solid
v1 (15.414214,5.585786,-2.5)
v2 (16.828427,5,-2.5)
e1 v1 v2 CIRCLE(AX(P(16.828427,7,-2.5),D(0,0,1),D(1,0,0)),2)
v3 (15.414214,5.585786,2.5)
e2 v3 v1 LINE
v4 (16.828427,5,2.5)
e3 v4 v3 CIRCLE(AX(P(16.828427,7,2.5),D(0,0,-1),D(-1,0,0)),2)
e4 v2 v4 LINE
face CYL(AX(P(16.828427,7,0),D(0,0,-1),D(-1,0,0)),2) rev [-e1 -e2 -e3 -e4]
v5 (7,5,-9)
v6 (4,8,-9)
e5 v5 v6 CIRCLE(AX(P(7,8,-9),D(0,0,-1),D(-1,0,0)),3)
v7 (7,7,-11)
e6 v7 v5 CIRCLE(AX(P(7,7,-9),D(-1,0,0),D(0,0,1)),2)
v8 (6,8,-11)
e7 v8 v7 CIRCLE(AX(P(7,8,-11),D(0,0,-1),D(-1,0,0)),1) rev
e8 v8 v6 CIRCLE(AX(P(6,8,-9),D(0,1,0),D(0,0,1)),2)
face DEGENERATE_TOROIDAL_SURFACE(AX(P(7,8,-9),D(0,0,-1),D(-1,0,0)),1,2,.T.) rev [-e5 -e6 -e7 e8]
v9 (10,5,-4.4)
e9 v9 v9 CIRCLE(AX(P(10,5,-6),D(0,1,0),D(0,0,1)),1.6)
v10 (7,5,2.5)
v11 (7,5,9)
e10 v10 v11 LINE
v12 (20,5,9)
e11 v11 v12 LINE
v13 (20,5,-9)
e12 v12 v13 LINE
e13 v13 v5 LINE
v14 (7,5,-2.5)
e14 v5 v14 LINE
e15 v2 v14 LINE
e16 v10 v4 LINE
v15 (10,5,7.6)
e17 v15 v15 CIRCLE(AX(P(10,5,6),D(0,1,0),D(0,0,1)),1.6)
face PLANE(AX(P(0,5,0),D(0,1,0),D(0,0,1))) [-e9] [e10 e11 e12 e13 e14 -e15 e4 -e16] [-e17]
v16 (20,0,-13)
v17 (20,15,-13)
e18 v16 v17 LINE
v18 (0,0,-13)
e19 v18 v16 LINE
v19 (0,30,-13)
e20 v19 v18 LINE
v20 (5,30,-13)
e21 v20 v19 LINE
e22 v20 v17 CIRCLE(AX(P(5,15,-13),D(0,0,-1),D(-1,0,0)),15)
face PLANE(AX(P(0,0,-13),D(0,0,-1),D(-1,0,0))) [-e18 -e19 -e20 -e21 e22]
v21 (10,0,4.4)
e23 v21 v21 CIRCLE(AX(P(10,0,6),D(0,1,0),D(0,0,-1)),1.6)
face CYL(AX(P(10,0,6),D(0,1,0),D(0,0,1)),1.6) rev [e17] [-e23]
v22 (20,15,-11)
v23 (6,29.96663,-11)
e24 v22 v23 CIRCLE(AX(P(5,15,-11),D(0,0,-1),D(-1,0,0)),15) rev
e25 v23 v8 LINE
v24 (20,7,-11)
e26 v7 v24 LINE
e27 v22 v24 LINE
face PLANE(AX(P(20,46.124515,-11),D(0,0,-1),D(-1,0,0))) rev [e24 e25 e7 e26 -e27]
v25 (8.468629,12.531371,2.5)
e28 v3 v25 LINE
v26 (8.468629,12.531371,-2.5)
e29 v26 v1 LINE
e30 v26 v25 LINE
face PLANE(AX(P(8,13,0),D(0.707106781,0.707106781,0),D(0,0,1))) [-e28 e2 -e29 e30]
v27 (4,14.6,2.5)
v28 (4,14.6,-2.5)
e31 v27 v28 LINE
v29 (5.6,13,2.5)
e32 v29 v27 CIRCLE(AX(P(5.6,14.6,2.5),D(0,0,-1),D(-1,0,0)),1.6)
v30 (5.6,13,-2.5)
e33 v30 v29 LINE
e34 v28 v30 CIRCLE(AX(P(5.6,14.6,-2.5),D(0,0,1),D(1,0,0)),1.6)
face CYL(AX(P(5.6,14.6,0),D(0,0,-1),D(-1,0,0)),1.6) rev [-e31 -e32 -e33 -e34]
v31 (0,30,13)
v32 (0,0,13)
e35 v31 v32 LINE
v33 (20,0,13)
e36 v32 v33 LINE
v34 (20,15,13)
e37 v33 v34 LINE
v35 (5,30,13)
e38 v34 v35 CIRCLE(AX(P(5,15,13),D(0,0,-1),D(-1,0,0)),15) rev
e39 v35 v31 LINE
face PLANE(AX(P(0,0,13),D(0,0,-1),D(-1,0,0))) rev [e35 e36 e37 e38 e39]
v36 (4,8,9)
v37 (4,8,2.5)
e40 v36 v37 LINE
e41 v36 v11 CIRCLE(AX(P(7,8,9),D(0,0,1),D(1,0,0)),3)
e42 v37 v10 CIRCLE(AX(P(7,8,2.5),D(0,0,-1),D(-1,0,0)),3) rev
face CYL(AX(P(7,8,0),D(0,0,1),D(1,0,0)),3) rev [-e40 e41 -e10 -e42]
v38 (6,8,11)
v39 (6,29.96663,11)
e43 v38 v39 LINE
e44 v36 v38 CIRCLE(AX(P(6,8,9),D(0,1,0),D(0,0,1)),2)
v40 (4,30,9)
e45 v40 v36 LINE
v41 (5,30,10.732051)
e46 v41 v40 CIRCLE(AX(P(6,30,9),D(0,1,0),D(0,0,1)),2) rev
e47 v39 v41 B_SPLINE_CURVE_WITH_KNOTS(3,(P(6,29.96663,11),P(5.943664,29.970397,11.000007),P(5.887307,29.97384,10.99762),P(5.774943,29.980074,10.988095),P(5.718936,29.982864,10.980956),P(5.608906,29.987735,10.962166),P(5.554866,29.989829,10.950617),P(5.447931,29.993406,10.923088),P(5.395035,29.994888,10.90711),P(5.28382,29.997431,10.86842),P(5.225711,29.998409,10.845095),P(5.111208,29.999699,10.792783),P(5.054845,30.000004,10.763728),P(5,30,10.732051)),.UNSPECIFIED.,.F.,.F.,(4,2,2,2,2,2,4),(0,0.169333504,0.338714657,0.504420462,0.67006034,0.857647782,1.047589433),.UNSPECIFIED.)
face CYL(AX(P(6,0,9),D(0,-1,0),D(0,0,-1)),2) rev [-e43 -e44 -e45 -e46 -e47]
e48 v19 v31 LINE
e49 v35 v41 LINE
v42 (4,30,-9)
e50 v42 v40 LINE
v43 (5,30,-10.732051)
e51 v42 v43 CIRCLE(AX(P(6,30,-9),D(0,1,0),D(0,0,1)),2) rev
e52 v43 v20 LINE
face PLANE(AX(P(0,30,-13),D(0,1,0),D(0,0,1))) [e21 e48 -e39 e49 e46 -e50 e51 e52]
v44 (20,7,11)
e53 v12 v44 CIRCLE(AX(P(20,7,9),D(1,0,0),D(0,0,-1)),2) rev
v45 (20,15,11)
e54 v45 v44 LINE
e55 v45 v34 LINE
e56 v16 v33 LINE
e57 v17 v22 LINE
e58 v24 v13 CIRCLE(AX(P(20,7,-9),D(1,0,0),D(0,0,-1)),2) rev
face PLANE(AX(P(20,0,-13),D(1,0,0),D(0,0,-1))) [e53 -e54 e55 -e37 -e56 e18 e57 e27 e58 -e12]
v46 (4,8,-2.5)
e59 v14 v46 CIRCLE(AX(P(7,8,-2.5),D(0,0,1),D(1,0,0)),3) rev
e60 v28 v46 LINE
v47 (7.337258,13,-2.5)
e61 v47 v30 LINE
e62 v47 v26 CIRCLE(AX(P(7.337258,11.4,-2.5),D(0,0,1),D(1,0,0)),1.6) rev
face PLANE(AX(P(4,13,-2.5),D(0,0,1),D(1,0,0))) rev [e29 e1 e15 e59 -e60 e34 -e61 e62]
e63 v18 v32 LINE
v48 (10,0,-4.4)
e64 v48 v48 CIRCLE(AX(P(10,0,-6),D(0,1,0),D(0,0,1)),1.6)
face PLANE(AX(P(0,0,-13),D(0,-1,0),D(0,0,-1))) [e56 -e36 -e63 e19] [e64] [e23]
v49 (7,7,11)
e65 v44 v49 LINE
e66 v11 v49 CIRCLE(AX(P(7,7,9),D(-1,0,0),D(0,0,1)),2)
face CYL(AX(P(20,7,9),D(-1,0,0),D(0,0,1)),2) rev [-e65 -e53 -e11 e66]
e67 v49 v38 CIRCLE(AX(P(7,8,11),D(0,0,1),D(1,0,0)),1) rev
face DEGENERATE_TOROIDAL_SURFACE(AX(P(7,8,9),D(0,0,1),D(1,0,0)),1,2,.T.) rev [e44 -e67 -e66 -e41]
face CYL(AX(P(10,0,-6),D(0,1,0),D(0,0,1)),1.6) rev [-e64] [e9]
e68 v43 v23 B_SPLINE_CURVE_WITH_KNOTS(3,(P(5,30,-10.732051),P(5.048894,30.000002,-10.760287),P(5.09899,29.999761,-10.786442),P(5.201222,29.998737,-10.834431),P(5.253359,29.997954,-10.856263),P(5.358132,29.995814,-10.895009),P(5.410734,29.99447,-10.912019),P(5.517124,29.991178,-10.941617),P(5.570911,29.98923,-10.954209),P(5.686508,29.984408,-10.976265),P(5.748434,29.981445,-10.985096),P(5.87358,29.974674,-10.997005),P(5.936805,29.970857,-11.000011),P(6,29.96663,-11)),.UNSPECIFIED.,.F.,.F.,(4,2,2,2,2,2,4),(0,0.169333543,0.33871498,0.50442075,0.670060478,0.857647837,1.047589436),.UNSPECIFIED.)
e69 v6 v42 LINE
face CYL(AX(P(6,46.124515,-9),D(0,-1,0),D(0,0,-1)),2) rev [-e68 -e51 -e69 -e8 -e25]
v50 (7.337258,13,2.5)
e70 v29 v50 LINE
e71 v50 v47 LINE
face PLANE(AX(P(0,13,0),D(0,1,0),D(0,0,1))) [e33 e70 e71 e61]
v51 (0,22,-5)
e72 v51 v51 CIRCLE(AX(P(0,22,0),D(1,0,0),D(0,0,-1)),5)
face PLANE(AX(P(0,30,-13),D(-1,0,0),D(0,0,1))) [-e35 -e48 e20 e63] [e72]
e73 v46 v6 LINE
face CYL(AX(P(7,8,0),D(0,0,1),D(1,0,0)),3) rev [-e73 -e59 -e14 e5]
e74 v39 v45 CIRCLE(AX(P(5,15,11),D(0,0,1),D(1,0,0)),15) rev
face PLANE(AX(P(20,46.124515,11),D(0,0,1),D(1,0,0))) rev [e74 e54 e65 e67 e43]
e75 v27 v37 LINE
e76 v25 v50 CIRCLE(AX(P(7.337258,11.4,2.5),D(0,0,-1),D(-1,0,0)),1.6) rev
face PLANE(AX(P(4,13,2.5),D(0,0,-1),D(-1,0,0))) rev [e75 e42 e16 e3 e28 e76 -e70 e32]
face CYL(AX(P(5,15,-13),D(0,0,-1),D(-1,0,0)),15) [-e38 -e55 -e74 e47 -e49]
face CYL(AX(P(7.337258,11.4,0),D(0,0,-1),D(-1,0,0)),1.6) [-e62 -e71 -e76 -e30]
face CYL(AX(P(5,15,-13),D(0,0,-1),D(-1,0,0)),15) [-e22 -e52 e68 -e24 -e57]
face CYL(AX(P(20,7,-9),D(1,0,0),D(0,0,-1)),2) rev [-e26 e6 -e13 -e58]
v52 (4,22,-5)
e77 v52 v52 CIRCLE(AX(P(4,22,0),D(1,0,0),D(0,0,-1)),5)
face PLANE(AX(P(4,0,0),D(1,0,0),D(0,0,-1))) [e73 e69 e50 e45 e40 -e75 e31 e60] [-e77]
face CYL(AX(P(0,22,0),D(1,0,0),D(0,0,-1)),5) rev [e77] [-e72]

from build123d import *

# Parameters (mm, degrees)
EXTRUDE_1_DEPTH      = 13
EXTRUDE_1_DEPTH_BACK = 13
SKETCH_2_R           = 5
CUT_EXTRUDE_1_DEPTH  = 38.322915213
SKETCH_3_R           = 1.6
CUT_EXTRUDE_2_DEPTH  = 37.783148315
EXTRUDE_START        = 3
SKETCH_4_W           = 18
SKETCH_4_H           = 26
SKETCH_4_R           = 1.6
EXTRUDE_2_DEPTH      = 3
EXTRUDE_START_2      = 2
SKETCH_5_W           = 26
SKETCH_5_H           = 25
SKETCH_5_R           = 5
EXTRUDE_3_DEPTH      = 2
SKETCH_6_W           = 14
SKETCH_6_H           = 5
EXTRUDE_4_DEPTH      = 8
CHAMFER_1_SIZE       = 10
FILLET_1_R           = 3
EXTRUDE_5_REACH      = 36.554
SKETCH_7_W           = 16
SKETCH_7_H           = 2
FILLET_2_R           = 15
FILLET_3_R           = 2
FILLET_4_R           = 1.6


with BuildPart() as part:
    # 草图1 → 凸台-拉伸1 (new, two sides: drawn at the far end of the back side and taken through both)
    with BuildSketch(Plane.XY.offset(-EXTRUDE_1_DEPTH_BACK)):
        Polygon((0, 30), (0, 0), (20, 0), (20, 2), (2, 2), (2, 30), align=None)
    extrude(amount=EXTRUDE_1_DEPTH + EXTRUDE_1_DEPTH_BACK)

    # 草图2 → 切除-拉伸1 (cut, through all)
    with BuildSketch(Plane(origin=(2, 0, 0), x_dir=(0, 0, -1), z_dir=(1, 0, 0))):
        with Locations((0, 22)):
            Circle(SKETCH_2_R)
    extrude(amount=-CUT_EXTRUDE_1_DEPTH, mode=Mode.SUBTRACT)

    # 草图3 → 切除-拉伸2 (cut, through all)
    with BuildSketch(Plane(origin=(0, 2, 0), x_dir=(1, 0, 0), z_dir=(0, 1, 0))):
        with Locations(Location((10, 6, 0), (0, 0, 270))):
            Circle(SKETCH_3_R)
        with Locations(Location((10, -6, 0), (0, 0, 90))):
            Circle(SKETCH_3_R)
    extrude(amount=-CUT_EXTRUDE_2_DEPTH, mode=Mode.SUBTRACT)

    # 草图4 → 凸台-拉伸2 (add)
    with BuildSketch(Plane(origin=(0, 2, 0), x_dir=(1, 0, 0), z_dir=(0, 1, 0)).offset(EXTRUDE_START)):
        with Locations((11, 0)):
            Rectangle(SKETCH_4_W, SKETCH_4_H)
        with Locations(Location((10, -6, 0), (0, 0, 270))):
            Circle(SKETCH_4_R, mode=Mode.SUBTRACT)
        with Locations(Location((10, 6, 0), (0, 0, 270))):
            Circle(SKETCH_4_R, mode=Mode.SUBTRACT)
    extrude(amount=-EXTRUDE_2_DEPTH)

    # 草图5 → 凸台-拉伸3 (add)
    with BuildSketch(Plane(origin=(2, 0, 0), x_dir=(0, 0, -1), z_dir=(1, 0, 0)).offset(EXTRUDE_START_2)):
        with Locations((0, 17.5)):
            Rectangle(SKETCH_5_W, SKETCH_5_H)
        with Locations((0, 22)):
            Circle(SKETCH_5_R, mode=Mode.SUBTRACT)
    extrude(amount=-EXTRUDE_3_DEPTH)

    # 草图6 → 凸台-拉伸4 (add)
    with BuildSketch(Plane(origin=(0, 5, 0), x_dir=(1, 0, 0), z_dir=(0, 1, 0))):
        with Locations((11, 0)):
            Rectangle(SKETCH_6_W, SKETCH_6_H)
    extrude(amount=EXTRUDE_4_DEPTH)

    # 倒角1
    # the kernel refuses this chamfer: 10 mm, written as the material it takes off along each edge
    with BuildSketch(Plane(origin=(18, 13, -28.21682988), x_dir=(-0.9996219169112968, 0.027495876610586317, 0), z_dir=(0, 0, 1))) as chamfer_1_piece_1_section:
        Polygon((CHAMFER_1_SIZE * 0.999621916911, CHAMFER_1_SIZE * 0.0274958766106), (-CHAMFER_1_SIZE * 0.0274958766106, CHAMFER_1_SIZE * 0.999621916911), (0, 0), align=None)
    chamfer_1_piece_1 = extrude(amount=56.433659759, mode=Mode.PRIVATE)
    chamfer_1_piece_1 = split(chamfer_1_piece_1, bisect_by=Plane(origin=(14.542815877, 5, 0), z_dir=(0, 1, 0)), keep=Keep.TOP, mode=Mode.PRIVATE)
    add(chamfer_1_piece_1, mode=Mode.SUBTRACT)

    # 圆角1
    fillet_1_edges = [part.edges().sort_by_distance(p)[0] for p in [
        (4, 5, 7.75),
        (4, 5, -7.75),
    ]]
    fillet(fillet_1_edges, radius=FILLET_1_R)

    # 凸台-拉伸5: up to this face of the body (flat: up to its plane)
    extrude_5_end = Plane(part.part.faces().sort_by_distance((2, 30, 0))[0])
    # 草图7 → 凸台-拉伸5 (add, up to the picked face)
    with BuildSketch(Plane(origin=(0, 5, 0), x_dir=(1, 0, 0), z_dir=(0, 1, 0)), mode=Mode.PRIVATE) as extrude_5_sk1:
        with Locations((12, 12)):
            Rectangle(SKETCH_7_W, SKETCH_7_H)
    extrude_5_tool1 = split(extrude(extrude_5_sk1.sketch, amount=EXTRUDE_5_REACH, mode=Mode.PRIVATE), bisect_by=extrude_5_end, keep=Keep.BOTH, mode=Mode.PRIVATE)
    # 草图7 → 凸台-拉伸5 (add, up to the picked face)
    with BuildSketch(Plane(origin=(0, 5, 0), x_dir=(1, 0, 0), z_dir=(0, 1, 0)), mode=Mode.PRIVATE) as extrude_5_sk2:
        with Locations((12, -12)):
            Rectangle(SKETCH_7_W, SKETCH_7_H)
    extrude_5_tool2 = split(extrude(extrude_5_sk2.sketch, amount=EXTRUDE_5_REACH, mode=Mode.PRIVATE), bisect_by=extrude_5_end, keep=Keep.BOTH, mode=Mode.PRIVATE)
    add(extrude_5_tool1.solids().sort_by(Axis((12, 5, -12), (0, 1, 0)))[0])
    add(extrude_5_tool2.solids().sort_by(Axis((12, 5, 12), (0, 1, 0)))[0])

    # 圆角2
    fillet_2_edges = [part.edges().sort_by_distance(p)[0] for p in [
        (20, 30, -12),
        (20, 30, 12),
    ]]
    fillet(fillet_2_edges, radius=FILLET_2_R)

    # 圆角3
    fillet_3_edges = [part.edges().sort_by_distance(p)[0] for p in [
        (13.5, 5, 11),
        (4.878679656, 5.878679656, 11),
        (13.5, 5, -11),
        (4.878679656, 5.878679656, -11),
        (16, 5, 0),
        (4, 19, 11),
        (4, 19, -11),
    ]]
    fillet(fillet_3_edges, radius=FILLET_3_R)

    # 圆角4
    fillet_4_edges = [part.edges().sort_by_distance(p)[0] for p in [
        (4, 13, 0),
        (8, 13, 0),
    ]]
    fillet(fillet_4_edges, radius=FILLET_4_R)


solid = part.part
